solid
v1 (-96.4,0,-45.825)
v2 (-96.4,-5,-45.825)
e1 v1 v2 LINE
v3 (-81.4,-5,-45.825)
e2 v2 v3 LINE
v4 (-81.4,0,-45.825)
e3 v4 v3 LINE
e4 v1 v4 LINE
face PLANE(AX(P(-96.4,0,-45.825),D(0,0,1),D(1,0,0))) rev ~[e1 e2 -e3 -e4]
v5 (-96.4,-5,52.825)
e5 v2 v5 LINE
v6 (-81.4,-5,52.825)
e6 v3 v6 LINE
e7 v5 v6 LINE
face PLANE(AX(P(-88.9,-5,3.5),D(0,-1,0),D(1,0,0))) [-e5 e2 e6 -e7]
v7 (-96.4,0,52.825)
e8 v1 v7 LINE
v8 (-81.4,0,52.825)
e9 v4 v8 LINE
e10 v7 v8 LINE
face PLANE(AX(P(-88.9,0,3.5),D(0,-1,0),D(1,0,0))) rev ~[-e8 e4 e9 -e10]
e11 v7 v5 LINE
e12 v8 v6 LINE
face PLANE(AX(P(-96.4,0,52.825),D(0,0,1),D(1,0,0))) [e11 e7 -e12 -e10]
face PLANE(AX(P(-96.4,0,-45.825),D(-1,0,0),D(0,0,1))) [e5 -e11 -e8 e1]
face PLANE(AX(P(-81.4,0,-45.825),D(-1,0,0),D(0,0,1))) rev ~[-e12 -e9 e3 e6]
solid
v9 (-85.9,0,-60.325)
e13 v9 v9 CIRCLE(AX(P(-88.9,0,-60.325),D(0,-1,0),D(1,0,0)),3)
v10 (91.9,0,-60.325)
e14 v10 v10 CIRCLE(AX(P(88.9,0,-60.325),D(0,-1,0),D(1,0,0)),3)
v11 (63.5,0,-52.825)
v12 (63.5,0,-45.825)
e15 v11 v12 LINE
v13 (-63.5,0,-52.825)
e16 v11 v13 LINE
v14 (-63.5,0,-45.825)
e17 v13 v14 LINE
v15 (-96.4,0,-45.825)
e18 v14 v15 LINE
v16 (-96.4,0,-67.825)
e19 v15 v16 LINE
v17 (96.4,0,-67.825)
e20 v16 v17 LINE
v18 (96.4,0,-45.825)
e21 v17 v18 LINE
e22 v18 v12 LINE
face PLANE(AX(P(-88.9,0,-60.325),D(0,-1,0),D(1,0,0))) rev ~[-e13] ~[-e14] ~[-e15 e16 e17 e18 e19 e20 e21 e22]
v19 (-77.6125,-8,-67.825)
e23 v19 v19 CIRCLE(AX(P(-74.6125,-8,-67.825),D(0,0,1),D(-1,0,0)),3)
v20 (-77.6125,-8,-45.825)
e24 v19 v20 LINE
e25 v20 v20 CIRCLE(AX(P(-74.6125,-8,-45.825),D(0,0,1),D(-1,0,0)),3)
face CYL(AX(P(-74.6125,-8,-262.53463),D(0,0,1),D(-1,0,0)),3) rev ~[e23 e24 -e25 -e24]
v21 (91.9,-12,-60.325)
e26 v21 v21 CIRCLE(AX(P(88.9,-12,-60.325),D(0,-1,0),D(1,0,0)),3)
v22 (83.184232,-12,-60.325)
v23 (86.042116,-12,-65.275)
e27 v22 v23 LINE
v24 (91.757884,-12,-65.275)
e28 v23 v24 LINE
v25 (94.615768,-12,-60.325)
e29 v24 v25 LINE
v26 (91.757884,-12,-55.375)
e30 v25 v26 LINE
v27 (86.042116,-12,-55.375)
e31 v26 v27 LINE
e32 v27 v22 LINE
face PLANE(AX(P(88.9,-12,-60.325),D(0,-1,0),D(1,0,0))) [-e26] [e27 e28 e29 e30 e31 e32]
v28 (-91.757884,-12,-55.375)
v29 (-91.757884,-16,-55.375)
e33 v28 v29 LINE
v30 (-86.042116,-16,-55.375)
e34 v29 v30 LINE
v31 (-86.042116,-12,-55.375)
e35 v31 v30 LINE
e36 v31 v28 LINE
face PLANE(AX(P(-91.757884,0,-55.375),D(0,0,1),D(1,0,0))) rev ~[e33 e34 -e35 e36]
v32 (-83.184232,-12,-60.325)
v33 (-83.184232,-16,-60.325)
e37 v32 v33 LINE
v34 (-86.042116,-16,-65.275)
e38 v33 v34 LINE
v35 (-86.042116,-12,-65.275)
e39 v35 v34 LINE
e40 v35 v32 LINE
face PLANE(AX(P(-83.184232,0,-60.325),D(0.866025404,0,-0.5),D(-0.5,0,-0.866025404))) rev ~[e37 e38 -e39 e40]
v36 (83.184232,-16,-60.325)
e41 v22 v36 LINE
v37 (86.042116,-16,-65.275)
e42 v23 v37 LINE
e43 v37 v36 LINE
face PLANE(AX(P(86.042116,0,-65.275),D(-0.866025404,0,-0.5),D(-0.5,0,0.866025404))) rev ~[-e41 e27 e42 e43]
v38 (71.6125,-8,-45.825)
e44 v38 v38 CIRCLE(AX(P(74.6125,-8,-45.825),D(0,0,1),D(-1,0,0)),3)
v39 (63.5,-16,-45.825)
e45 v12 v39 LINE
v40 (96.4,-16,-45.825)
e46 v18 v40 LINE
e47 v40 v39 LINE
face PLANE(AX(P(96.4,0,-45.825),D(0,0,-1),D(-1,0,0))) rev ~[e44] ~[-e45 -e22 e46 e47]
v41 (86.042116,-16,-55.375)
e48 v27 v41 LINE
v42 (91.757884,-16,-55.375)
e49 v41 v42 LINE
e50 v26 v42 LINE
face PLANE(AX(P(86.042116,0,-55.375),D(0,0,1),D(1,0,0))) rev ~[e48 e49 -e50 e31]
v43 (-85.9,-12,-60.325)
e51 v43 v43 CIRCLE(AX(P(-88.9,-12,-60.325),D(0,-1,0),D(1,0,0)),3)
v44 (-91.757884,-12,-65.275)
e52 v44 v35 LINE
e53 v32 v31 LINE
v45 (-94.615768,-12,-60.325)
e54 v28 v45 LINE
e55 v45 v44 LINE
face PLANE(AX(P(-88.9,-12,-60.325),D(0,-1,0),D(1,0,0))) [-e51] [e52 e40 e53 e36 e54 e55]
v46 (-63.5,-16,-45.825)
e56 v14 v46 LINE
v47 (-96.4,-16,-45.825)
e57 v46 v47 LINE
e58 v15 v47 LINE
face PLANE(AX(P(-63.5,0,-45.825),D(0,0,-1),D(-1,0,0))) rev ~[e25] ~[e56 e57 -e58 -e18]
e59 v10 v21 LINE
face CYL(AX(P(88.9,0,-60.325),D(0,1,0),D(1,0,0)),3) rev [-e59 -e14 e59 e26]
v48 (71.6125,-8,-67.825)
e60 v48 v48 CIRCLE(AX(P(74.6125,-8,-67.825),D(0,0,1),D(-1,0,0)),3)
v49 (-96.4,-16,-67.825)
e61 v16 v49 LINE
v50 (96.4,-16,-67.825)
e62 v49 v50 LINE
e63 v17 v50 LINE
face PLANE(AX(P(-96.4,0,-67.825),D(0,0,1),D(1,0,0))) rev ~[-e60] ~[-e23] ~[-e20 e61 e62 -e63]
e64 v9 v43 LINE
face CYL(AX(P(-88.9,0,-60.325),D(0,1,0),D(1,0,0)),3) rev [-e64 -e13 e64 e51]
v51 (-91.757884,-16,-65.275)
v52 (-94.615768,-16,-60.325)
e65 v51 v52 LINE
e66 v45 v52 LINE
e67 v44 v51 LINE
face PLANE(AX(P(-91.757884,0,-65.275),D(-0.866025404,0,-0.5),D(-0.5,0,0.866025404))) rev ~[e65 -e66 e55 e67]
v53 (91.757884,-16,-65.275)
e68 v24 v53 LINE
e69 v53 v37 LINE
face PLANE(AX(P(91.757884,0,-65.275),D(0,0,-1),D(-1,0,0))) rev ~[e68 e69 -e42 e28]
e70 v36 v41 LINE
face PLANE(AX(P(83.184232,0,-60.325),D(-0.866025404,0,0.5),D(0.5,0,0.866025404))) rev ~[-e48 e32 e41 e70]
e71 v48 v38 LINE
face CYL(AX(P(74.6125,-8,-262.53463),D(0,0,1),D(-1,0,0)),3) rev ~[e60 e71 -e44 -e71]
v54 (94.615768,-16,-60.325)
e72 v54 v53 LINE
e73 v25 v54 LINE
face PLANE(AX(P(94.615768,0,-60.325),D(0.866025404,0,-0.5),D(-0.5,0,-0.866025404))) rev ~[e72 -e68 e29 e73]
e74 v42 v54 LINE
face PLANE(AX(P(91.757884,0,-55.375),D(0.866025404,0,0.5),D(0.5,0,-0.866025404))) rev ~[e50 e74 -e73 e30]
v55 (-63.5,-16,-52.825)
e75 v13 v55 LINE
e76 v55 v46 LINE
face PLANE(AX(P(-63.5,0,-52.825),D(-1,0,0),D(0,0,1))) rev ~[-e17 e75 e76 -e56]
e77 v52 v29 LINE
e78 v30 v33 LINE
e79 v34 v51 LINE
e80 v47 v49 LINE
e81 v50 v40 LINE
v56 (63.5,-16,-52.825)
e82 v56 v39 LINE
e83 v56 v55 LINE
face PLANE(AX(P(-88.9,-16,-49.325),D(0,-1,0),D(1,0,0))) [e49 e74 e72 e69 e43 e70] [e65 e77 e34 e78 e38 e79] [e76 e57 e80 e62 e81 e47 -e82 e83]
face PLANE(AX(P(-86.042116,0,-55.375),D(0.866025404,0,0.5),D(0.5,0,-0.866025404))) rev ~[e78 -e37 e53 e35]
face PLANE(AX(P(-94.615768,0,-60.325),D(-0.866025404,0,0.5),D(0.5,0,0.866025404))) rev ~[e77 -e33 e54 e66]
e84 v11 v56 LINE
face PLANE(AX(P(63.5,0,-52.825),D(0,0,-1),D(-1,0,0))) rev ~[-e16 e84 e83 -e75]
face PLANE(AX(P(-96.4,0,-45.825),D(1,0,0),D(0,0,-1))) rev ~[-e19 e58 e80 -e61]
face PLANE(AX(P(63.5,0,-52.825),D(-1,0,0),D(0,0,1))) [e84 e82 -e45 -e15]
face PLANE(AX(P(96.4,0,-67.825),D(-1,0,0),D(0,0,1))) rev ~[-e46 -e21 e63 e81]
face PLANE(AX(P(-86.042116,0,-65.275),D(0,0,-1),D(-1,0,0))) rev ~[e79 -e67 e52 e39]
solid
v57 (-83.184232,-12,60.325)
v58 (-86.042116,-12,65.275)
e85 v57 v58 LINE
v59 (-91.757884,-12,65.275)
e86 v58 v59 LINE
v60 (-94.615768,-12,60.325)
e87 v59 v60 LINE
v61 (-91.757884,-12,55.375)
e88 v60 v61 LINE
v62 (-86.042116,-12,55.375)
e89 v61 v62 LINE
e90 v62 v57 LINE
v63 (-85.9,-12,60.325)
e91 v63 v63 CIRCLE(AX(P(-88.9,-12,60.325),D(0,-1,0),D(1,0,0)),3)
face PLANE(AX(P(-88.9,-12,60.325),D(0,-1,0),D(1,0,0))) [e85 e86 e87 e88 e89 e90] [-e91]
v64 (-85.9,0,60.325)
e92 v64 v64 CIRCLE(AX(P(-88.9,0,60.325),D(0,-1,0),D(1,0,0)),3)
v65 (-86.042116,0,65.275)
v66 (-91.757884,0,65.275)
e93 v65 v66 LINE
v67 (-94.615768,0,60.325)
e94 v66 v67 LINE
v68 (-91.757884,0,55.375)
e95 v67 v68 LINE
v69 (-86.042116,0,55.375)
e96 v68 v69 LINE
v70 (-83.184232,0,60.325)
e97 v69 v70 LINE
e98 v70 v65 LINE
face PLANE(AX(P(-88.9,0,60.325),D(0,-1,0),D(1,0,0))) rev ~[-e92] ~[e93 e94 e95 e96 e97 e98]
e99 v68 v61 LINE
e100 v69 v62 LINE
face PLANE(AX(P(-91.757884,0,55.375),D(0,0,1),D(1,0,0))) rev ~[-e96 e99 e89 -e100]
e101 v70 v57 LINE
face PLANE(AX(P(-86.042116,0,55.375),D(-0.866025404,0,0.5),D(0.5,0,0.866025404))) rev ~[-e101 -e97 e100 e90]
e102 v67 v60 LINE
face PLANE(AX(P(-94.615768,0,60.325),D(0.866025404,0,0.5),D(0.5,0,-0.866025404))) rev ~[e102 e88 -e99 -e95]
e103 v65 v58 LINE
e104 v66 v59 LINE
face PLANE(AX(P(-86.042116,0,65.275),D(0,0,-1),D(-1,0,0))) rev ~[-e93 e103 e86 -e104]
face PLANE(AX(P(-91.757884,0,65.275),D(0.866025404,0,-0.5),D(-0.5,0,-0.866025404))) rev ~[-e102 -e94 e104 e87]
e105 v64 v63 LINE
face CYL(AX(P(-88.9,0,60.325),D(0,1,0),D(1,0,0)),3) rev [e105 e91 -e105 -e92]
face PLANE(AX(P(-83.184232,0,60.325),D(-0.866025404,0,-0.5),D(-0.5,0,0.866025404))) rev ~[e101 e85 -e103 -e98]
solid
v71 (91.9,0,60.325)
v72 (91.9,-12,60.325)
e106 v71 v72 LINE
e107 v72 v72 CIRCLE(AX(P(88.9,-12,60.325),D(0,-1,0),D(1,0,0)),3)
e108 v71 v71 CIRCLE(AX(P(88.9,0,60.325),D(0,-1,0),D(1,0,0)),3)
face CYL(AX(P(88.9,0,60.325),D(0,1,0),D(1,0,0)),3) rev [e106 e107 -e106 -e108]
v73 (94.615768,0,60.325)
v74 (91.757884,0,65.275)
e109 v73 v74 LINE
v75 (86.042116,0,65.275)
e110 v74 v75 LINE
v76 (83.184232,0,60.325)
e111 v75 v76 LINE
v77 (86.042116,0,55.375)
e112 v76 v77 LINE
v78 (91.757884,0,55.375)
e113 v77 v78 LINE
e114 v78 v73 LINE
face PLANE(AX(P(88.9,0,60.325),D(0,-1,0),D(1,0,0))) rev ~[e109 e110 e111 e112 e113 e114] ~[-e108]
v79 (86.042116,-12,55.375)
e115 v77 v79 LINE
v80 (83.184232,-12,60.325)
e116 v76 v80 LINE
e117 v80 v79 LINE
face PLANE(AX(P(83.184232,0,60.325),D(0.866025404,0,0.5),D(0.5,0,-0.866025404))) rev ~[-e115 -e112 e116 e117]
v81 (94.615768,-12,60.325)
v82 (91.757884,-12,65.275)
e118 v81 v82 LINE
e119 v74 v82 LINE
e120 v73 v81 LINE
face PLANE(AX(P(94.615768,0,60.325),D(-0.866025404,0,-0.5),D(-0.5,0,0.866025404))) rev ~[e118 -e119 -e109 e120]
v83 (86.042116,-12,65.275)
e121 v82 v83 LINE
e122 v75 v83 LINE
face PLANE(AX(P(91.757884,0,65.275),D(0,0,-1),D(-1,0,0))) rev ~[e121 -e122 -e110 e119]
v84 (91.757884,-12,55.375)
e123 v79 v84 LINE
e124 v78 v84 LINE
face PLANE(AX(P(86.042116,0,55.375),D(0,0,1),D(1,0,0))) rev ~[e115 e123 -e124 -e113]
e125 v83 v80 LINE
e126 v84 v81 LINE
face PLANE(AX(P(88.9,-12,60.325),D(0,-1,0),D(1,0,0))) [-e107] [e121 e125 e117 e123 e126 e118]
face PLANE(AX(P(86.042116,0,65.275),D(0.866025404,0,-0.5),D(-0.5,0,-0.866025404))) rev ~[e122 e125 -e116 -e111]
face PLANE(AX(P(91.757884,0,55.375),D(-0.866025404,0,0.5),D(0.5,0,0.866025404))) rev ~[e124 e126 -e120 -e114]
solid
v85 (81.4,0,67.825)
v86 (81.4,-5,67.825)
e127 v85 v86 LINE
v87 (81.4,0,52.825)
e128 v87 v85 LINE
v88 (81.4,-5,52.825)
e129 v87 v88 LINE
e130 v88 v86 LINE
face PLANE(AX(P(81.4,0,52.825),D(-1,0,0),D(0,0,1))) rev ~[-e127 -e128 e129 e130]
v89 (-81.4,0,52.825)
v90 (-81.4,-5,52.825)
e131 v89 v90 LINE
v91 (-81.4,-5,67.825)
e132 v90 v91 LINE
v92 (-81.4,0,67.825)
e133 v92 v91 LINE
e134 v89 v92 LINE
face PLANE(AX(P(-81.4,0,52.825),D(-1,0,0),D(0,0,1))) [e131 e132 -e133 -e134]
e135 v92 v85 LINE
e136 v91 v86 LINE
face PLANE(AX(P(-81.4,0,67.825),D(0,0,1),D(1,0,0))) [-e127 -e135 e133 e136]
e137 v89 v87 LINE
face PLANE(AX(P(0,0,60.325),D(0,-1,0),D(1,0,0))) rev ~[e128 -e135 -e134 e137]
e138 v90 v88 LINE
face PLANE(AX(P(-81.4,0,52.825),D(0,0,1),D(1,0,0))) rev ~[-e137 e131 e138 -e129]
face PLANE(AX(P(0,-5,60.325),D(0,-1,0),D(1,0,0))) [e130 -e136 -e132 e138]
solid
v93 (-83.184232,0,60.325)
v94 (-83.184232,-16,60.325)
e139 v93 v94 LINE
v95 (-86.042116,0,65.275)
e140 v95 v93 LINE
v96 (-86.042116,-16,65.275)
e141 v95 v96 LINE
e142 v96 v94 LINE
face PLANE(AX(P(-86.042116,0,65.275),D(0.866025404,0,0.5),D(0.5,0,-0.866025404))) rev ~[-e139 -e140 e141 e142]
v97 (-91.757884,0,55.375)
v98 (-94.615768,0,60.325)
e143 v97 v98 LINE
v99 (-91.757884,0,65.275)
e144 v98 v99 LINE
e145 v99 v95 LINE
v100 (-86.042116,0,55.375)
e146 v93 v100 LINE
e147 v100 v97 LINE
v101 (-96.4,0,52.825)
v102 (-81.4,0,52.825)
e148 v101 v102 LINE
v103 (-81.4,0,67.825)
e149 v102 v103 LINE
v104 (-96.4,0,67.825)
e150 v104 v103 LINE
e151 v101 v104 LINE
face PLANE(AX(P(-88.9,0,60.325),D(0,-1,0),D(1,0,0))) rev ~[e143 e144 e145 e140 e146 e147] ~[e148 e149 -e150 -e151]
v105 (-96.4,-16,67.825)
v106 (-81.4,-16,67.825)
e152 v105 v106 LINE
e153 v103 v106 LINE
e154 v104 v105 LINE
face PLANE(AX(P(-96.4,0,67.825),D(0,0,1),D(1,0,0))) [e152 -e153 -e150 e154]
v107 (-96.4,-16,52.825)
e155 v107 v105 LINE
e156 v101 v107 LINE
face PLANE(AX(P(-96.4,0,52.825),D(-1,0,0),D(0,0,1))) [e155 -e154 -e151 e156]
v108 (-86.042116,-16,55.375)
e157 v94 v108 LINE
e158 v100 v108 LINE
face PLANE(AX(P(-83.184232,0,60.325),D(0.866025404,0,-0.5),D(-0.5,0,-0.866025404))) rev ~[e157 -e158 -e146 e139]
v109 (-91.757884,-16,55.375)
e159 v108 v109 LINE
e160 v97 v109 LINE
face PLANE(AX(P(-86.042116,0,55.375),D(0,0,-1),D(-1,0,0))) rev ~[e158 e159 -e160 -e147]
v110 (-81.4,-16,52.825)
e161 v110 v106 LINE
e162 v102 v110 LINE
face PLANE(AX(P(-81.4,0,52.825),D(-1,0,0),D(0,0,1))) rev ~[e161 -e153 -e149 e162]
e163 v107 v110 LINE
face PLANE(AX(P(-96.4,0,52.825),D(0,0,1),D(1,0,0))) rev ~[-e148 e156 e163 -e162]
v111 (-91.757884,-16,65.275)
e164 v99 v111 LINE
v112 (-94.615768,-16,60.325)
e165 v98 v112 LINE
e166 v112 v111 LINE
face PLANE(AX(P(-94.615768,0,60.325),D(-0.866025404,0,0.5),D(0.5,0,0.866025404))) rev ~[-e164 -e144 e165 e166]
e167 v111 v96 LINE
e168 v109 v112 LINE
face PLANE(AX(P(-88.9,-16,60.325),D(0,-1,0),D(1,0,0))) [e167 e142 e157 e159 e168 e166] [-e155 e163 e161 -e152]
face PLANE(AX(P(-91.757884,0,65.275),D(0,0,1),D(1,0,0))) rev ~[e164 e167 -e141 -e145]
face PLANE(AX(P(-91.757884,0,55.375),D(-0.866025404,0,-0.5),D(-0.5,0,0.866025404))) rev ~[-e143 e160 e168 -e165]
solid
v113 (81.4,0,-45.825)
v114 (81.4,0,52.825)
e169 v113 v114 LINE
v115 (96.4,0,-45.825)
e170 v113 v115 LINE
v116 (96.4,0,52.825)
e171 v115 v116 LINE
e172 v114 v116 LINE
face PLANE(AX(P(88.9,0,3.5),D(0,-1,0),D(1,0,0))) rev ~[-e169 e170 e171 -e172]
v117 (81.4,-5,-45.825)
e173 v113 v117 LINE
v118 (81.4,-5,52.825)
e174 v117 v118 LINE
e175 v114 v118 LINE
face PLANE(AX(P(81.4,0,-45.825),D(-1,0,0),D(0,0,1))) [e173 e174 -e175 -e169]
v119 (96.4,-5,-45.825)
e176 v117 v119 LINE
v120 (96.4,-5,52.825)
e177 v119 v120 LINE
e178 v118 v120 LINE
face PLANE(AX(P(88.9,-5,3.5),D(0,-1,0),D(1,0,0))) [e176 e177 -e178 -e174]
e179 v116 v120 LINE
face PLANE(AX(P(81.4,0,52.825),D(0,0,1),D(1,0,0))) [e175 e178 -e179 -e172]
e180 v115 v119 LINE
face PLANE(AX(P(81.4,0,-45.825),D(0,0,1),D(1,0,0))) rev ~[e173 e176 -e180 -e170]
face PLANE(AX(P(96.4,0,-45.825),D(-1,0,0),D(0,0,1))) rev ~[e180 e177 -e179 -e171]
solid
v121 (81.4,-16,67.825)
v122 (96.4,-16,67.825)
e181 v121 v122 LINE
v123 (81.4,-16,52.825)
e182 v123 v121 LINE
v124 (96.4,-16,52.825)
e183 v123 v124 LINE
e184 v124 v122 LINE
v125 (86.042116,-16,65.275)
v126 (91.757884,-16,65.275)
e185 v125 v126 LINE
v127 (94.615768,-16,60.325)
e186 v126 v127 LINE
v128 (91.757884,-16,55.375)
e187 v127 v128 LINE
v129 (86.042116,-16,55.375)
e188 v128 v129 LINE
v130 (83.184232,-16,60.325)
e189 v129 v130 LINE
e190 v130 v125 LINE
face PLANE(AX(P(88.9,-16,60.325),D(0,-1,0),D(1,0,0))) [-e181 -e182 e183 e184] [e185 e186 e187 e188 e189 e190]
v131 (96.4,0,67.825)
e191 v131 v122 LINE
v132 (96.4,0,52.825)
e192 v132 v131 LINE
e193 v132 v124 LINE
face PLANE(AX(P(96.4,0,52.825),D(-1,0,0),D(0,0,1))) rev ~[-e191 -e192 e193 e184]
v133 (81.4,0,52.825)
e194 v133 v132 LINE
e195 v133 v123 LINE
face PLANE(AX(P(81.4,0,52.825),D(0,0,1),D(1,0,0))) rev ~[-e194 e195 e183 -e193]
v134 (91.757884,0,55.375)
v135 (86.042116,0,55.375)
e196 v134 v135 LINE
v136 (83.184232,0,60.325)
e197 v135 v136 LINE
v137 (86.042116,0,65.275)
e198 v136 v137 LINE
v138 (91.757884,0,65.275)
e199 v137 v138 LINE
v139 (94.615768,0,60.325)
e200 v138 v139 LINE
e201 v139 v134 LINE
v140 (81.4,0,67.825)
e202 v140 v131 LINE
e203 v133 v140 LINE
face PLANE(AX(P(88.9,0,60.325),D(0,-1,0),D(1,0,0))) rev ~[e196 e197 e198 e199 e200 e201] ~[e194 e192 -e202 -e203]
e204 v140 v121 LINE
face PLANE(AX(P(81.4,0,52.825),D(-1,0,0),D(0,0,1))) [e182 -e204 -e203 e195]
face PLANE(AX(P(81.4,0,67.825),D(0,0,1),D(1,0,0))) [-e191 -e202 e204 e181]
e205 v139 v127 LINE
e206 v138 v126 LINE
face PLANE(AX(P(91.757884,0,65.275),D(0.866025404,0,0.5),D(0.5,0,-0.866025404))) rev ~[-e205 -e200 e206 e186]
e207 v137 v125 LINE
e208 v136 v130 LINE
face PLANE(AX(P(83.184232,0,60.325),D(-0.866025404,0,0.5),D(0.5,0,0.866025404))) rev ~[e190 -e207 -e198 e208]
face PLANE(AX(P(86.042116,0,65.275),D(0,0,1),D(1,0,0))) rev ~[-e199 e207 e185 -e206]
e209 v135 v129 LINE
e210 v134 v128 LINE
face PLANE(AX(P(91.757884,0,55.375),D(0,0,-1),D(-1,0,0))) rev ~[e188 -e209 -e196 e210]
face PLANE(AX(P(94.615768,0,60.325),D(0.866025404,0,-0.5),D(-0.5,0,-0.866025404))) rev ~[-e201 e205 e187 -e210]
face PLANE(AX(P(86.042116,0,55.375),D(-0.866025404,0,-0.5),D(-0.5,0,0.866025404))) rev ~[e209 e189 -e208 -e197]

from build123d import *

# Parameters (mm, degrees)
F0_W     = 15
F0_H     = 15
F1_DEPTH = 16
F0_H_2   = 7
F0_W_2   = 17.9
F0_R     = 3
F2_DEPTH = 12
F0_H_3   = 98.65
F3_DEPTH = 5
F0_W_3   = 162.8
F6_D     = 6


with BuildPart() as f1:
    # F0 (on Front) → F1 (new body)
    with BuildSketch(Plane.XZ):
        with Locations((-88.9, 60.325)):
            Rectangle(F0_W, F0_H)
        Polygon((-83.184232335, 60.325), (-86.0421161675, 55.375), (-91.7578838325, 55.375), (-94.615767665, 60.325), (-91.7578838325, 65.275), (-86.0421161675, 65.275), align=None, mode=Mode.SUBTRACT)
    extrude(amount=F1_DEPTH)


with BuildPart() as f1b:
    # F0 (on Front) → F1, piece 2 (new body)
    with BuildSketch(Plane.XZ):
        with Locations((88.9, 60.325)):
            Rectangle(F0_W, F0_H)
        Polygon((94.615767665, 60.325), (91.7578838325, 55.375), (86.0421161675, 55.375), (83.184232335, 60.325), (86.0421161675, 65.275), (91.7578838325, 65.275), align=None, mode=Mode.SUBTRACT)
    extrude(amount=F1_DEPTH)


with BuildPart() as f1c:
    # F0 (on Front) → F1, piece 3 (new body)
    with BuildSketch(Plane.XZ):
        with Locations((-88.9, -49.325)):
            Rectangle(F0_W, F0_H_2)
        with Locations((-72.45, -49.325)):
            Rectangle(F0_W_2, F0_H_2)
        Polygon((-81.4, -52.825), (-96.4, -52.825), (-96.4, -67.825), (-85.725, -67.825), (-81.4, -67.825), align=None)
        Polygon((-94.615767665, -60.325), (-91.7578838325, -55.375), (-86.0421161675, -55.375), (-83.184232335, -60.325), (-86.0421161675, -65.275), (-91.7578838325, -65.275), align=None, mode=Mode.SUBTRACT)
        Polygon((-63.5, -52.825), (-81.4, -52.825), (-81.4, -67.825), (-63.5, -67.825), (63.5, -67.825), (70.725, -67.825), (81.4, -67.825), (81.4, -52.825), (63.5, -52.825), align=None)
        with Locations((88.9, -49.325)):
            Rectangle(F0_W, F0_H_2)
        with Locations((72.45, -49.325)):
            Rectangle(F0_W_2, F0_H_2)
        Polygon((96.4, -52.825), (81.4, -52.825), (81.4, -67.825), (85.725, -67.825), (96.4, -67.825), align=None)
        Polygon((83.184232335, -60.325), (86.0421161675, -55.375), (91.7578838325, -55.375), (94.615767665, -60.325), (91.7578838325, -65.275), (86.0421161675, -65.275), align=None, mode=Mode.SUBTRACT)
    extrude(amount=F1_DEPTH)

    # F0 (on Front) → F2 (join)
    with BuildSketch(Plane.XZ):
        Polygon((-86.0421161675, -55.375), (-91.7578838325, -55.375), (-94.615767665, -60.325), (-91.7578838325, -65.275), (-86.0421161675, -65.275), (-83.184232335, -60.325), align=None)
        with Locations((-88.9, -60.325)):
            Circle(F0_R, mode=Mode.SUBTRACT)
        Polygon((91.7578838325, -55.375), (86.0421161675, -55.375), (83.184232335, -60.325), (86.0421161675, -65.275), (91.7578838325, -65.275), (94.615767665, -60.325), align=None)
        with Locations((88.9, -60.325)):
            Circle(F0_R, mode=Mode.SUBTRACT)
    extrude(amount=F2_DEPTH)

    # F6 (through all)
    with Locations(Plane(origin=(0, 0, -67.825), x_dir=(1, 0, 0), z_dir=(0, 0, -1))):
        with Locations((74.6125, 8), (-74.6125, 8)):
            Hole(F6_D / 2)


with BuildPart() as f2:
    # F0 (on Front) → F2, piece 2 (new body)
    with BuildSketch(Plane.XZ):
        Polygon((-91.7578838325, 55.375), (-86.0421161675, 55.375), (-83.184232335, 60.325), (-86.0421161675, 65.275), (-91.7578838325, 65.275), (-94.615767665, 60.325), align=None)
        with Locations((-88.9, 60.325)):
            Circle(F0_R, mode=Mode.SUBTRACT)
    extrude(amount=F2_DEPTH)


with BuildPart() as f2b:
    # F0 (on Front) → F2, piece 3 (new body)
    with BuildSketch(Plane.XZ):
        Polygon((86.0421161675, 55.375), (91.7578838325, 55.375), (94.615767665, 60.325), (91.7578838325, 65.275), (86.0421161675, 65.275), (83.184232335, 60.325), align=None)
        with Locations((88.9, 60.325)):
            Circle(F0_R, mode=Mode.SUBTRACT)
    extrude(amount=F2_DEPTH)


with BuildPart() as f3:
    # F0 (on Front) → F3 (new body)
    with BuildSketch(Plane.XZ):
        with Locations((-88.9, 3.5)):
            Rectangle(F0_W, F0_H_3)
    extrude(amount=F3_DEPTH)


with BuildPart() as f3b:
    # F0 (on Front) → F3, piece 2 (new body)
    with BuildSketch(Plane.XZ):
        with Locations((0, 60.325)):
            Rectangle(F0_W_3, F0_H)
    extrude(amount=F3_DEPTH)


with BuildPart() as f3c:
    # F0 (on Front) → F3, piece 3 (new body)
    with BuildSketch(Plane.XZ):
        with Locations((88.9, 3.5)):
            Rectangle(F0_W, F0_H_3)
    extrude(amount=F3_DEPTH)


solid = Compound([f1.part, f1b.part, f1c.part, f2.part, f2b.part, f3.part, f3b.part, f3c.part])
